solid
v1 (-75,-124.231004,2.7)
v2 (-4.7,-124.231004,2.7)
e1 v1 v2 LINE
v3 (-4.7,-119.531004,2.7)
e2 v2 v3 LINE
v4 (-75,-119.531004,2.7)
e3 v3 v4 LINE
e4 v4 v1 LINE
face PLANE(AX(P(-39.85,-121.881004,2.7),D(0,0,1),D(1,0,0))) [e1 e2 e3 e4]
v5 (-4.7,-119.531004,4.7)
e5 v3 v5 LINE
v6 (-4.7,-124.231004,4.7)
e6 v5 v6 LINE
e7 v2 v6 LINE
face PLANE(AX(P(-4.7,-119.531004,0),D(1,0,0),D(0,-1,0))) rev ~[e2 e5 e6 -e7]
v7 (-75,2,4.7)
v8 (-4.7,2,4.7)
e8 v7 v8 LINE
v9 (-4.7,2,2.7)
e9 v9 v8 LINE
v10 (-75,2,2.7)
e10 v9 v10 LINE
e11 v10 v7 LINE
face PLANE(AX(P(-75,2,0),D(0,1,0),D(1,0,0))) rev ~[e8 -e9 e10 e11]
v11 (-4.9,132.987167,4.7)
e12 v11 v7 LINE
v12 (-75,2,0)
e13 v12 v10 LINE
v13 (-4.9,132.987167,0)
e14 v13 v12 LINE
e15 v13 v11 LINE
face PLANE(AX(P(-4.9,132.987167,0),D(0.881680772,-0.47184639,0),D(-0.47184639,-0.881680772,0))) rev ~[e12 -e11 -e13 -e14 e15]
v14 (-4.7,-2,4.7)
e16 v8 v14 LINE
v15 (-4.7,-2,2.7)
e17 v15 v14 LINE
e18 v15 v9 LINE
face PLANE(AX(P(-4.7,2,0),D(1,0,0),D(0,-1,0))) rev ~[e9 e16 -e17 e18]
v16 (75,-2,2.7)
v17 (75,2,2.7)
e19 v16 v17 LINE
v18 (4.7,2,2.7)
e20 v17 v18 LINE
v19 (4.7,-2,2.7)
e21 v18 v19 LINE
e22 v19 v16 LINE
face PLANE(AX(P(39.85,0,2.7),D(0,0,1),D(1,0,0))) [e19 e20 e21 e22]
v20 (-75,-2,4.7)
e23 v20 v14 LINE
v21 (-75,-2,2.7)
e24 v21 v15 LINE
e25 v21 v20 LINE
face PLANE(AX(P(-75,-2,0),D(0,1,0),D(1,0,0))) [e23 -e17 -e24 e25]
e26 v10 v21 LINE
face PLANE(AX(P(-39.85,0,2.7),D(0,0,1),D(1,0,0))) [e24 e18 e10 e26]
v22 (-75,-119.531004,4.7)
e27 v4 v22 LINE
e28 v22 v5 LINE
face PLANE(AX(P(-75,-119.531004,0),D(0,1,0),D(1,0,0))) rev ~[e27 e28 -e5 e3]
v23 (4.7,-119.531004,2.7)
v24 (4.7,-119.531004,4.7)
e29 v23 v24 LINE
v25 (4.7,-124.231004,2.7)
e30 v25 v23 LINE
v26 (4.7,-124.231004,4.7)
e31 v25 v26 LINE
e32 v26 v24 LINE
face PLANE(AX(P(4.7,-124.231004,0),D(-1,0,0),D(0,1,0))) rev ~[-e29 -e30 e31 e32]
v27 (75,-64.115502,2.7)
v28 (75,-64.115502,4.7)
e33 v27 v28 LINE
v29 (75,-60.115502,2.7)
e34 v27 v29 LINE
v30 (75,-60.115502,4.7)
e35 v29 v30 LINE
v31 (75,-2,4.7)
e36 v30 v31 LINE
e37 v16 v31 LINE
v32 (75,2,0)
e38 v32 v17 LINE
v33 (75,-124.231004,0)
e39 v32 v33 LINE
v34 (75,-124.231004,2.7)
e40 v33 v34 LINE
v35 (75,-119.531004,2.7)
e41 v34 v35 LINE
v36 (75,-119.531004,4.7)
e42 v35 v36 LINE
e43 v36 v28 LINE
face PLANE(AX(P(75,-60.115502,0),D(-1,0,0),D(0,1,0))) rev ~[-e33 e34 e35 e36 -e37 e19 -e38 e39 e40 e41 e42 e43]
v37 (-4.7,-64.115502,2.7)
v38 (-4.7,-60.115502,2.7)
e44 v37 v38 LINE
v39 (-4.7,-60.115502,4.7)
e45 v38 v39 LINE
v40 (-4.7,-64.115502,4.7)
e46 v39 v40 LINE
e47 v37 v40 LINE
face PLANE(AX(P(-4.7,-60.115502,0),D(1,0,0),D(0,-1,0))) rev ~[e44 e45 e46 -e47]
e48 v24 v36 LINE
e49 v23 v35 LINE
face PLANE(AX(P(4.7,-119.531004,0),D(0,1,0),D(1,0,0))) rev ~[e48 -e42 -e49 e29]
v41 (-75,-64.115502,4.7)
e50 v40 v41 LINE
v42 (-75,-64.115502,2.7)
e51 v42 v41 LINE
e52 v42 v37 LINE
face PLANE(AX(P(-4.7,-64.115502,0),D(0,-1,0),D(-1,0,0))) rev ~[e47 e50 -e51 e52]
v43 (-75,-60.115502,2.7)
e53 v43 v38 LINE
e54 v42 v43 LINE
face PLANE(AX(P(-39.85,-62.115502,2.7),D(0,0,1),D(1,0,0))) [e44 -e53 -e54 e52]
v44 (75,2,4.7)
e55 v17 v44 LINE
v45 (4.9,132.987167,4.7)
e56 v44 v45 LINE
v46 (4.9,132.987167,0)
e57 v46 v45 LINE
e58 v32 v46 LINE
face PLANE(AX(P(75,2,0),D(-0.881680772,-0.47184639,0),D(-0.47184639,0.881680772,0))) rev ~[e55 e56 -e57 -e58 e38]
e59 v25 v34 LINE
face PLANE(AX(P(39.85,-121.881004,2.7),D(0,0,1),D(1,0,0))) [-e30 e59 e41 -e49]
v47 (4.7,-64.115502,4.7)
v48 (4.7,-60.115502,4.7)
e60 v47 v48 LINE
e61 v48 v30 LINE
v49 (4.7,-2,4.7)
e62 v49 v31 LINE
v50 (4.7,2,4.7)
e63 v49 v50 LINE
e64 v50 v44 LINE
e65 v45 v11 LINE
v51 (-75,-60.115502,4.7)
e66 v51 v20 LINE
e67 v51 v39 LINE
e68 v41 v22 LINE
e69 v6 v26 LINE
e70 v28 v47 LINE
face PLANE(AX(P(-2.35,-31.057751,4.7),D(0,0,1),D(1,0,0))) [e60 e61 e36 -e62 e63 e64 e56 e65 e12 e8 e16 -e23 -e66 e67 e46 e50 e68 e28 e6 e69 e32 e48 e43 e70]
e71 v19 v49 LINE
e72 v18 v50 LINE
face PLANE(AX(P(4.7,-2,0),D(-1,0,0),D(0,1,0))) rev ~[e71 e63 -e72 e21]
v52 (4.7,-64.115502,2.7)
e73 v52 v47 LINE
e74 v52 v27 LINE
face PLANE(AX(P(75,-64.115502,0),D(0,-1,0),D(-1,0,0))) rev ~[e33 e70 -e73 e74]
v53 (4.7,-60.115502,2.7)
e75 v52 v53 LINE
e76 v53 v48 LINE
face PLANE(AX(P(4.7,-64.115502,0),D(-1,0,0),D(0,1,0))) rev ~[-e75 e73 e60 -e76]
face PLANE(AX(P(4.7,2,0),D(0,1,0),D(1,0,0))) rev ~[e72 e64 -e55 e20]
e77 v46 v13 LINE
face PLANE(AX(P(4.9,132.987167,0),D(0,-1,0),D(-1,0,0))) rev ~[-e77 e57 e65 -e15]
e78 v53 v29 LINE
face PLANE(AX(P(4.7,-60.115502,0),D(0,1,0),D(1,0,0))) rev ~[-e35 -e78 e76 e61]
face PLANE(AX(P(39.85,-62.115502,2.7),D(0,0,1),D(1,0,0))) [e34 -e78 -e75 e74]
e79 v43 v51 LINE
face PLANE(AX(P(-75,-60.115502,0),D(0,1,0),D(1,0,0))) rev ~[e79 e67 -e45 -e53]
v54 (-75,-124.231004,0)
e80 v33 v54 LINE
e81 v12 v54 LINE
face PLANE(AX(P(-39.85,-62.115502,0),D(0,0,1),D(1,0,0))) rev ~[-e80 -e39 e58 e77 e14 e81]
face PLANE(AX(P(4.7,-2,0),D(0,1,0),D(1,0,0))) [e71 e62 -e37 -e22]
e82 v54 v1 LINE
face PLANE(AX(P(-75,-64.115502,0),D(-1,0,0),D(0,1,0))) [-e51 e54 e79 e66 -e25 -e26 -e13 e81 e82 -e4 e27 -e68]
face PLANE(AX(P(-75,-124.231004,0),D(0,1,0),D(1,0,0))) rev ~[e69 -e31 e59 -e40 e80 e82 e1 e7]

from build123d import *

# Parameters (mm, degrees)
F0_W     = 70.3
F0_H     = 58.1155021116
F1_DEPTH = 4.7
F2_DEPTH = 2.7
F0_H_2   = 4
F0_H_3   = 4.7
F3_DEPTH = 2.7


# Not quite as in the source:
# - a feature names something its author has since deleted; it is built from what else it names


with BuildPart() as f1:
    # F0 (on Top) → F1 (new body)
    with BuildSketch(Plane.XY):
        Polygon((0, -2), (0, 0), (0, 2), (-4.7, 2), (-4.7, -2), (-4.7, -60.1155021116), (-4.7, -64.1155021116), (0, -64.1155021116), (0, -62.1155021116), (0, -60.1155021116), align=None)
        Polygon((0, 2), (0, 0), (0, -2), (0, -60.1155021116), (0, -62.1155021116), (0, -64.1155021116), (4.7, -64.1155021116), (4.7, -60.1155021116), (4.7, -2), (4.7, 2), align=None)
        Polygon((-4.7, 2), (0, 2), (0, 132.9871674252), (-4.9, 132.9871674252), (-75, 2), align=None)
        Polygon((0, 132.9871674252), (0, 2), (4.7, 2), (75, 2), (4.9, 132.9871674252), align=None)
        with Locations((-39.85, -31.0577510558)):
            Rectangle(F0_W, F0_H)
        with Locations((39.85, -31.0577510558)):
            Rectangle(F0_W, F0_H)
        Polygon((4.7, -64.1155021116), (0, -64.1155021116), (0, -124.2310042232), (4.7, -124.2310042232), (4.7, -119.5310042232), (75, -119.5310042232), (75, -64.1155021116), align=None)
        Polygon((0, -124.2310042232), (0, -64.1155021116), (-4.7, -64.1155021116), (-75, -64.1155021116), (-75, -119.5310042232), (-4.7, -119.5310042232), (-4.7, -121.7700988054), (-4.7, -124.2310042232), align=None)
    extrude(amount=F1_DEPTH)

    # F0 (on Top) → F2 (join)
    with BuildSketch(Plane.XY):
        Polygon((-4.7, -2), (-4.7, 2), (-75, 2), (-75, 0), (-75, -2), align=None)
        Polygon((75, 2), (4.7, 2), (4.7, -2), (75, -2), (75, 0), align=None)
    extrude(amount=F2_DEPTH)

    # F0 (on Top) → F3 (join)
    with BuildSketch(Plane.XY):
        with Locations((-39.85, -62.1155021116)):
            Rectangle(F0_W, F0_H_2)
        with Locations((39.85, -62.1155021116)):
            Rectangle(F0_W, F0_H_2)
        Polygon((75, 2), (4.7, 2), (4.7, -2), (75, -2), (75, 0), align=None)
        Polygon((-75, -124.2310042232), (-4.7, -124.2310042232), (-4.7, -121.7700988054), (-4.7, -119.5310042232), (-75, -119.5310042232), align=None)
        with Locations((39.85, -121.8810042232)):
            Rectangle(F0_W, F0_H_3)
    extrude(amount=F3_DEPTH)


solid = f1.part
